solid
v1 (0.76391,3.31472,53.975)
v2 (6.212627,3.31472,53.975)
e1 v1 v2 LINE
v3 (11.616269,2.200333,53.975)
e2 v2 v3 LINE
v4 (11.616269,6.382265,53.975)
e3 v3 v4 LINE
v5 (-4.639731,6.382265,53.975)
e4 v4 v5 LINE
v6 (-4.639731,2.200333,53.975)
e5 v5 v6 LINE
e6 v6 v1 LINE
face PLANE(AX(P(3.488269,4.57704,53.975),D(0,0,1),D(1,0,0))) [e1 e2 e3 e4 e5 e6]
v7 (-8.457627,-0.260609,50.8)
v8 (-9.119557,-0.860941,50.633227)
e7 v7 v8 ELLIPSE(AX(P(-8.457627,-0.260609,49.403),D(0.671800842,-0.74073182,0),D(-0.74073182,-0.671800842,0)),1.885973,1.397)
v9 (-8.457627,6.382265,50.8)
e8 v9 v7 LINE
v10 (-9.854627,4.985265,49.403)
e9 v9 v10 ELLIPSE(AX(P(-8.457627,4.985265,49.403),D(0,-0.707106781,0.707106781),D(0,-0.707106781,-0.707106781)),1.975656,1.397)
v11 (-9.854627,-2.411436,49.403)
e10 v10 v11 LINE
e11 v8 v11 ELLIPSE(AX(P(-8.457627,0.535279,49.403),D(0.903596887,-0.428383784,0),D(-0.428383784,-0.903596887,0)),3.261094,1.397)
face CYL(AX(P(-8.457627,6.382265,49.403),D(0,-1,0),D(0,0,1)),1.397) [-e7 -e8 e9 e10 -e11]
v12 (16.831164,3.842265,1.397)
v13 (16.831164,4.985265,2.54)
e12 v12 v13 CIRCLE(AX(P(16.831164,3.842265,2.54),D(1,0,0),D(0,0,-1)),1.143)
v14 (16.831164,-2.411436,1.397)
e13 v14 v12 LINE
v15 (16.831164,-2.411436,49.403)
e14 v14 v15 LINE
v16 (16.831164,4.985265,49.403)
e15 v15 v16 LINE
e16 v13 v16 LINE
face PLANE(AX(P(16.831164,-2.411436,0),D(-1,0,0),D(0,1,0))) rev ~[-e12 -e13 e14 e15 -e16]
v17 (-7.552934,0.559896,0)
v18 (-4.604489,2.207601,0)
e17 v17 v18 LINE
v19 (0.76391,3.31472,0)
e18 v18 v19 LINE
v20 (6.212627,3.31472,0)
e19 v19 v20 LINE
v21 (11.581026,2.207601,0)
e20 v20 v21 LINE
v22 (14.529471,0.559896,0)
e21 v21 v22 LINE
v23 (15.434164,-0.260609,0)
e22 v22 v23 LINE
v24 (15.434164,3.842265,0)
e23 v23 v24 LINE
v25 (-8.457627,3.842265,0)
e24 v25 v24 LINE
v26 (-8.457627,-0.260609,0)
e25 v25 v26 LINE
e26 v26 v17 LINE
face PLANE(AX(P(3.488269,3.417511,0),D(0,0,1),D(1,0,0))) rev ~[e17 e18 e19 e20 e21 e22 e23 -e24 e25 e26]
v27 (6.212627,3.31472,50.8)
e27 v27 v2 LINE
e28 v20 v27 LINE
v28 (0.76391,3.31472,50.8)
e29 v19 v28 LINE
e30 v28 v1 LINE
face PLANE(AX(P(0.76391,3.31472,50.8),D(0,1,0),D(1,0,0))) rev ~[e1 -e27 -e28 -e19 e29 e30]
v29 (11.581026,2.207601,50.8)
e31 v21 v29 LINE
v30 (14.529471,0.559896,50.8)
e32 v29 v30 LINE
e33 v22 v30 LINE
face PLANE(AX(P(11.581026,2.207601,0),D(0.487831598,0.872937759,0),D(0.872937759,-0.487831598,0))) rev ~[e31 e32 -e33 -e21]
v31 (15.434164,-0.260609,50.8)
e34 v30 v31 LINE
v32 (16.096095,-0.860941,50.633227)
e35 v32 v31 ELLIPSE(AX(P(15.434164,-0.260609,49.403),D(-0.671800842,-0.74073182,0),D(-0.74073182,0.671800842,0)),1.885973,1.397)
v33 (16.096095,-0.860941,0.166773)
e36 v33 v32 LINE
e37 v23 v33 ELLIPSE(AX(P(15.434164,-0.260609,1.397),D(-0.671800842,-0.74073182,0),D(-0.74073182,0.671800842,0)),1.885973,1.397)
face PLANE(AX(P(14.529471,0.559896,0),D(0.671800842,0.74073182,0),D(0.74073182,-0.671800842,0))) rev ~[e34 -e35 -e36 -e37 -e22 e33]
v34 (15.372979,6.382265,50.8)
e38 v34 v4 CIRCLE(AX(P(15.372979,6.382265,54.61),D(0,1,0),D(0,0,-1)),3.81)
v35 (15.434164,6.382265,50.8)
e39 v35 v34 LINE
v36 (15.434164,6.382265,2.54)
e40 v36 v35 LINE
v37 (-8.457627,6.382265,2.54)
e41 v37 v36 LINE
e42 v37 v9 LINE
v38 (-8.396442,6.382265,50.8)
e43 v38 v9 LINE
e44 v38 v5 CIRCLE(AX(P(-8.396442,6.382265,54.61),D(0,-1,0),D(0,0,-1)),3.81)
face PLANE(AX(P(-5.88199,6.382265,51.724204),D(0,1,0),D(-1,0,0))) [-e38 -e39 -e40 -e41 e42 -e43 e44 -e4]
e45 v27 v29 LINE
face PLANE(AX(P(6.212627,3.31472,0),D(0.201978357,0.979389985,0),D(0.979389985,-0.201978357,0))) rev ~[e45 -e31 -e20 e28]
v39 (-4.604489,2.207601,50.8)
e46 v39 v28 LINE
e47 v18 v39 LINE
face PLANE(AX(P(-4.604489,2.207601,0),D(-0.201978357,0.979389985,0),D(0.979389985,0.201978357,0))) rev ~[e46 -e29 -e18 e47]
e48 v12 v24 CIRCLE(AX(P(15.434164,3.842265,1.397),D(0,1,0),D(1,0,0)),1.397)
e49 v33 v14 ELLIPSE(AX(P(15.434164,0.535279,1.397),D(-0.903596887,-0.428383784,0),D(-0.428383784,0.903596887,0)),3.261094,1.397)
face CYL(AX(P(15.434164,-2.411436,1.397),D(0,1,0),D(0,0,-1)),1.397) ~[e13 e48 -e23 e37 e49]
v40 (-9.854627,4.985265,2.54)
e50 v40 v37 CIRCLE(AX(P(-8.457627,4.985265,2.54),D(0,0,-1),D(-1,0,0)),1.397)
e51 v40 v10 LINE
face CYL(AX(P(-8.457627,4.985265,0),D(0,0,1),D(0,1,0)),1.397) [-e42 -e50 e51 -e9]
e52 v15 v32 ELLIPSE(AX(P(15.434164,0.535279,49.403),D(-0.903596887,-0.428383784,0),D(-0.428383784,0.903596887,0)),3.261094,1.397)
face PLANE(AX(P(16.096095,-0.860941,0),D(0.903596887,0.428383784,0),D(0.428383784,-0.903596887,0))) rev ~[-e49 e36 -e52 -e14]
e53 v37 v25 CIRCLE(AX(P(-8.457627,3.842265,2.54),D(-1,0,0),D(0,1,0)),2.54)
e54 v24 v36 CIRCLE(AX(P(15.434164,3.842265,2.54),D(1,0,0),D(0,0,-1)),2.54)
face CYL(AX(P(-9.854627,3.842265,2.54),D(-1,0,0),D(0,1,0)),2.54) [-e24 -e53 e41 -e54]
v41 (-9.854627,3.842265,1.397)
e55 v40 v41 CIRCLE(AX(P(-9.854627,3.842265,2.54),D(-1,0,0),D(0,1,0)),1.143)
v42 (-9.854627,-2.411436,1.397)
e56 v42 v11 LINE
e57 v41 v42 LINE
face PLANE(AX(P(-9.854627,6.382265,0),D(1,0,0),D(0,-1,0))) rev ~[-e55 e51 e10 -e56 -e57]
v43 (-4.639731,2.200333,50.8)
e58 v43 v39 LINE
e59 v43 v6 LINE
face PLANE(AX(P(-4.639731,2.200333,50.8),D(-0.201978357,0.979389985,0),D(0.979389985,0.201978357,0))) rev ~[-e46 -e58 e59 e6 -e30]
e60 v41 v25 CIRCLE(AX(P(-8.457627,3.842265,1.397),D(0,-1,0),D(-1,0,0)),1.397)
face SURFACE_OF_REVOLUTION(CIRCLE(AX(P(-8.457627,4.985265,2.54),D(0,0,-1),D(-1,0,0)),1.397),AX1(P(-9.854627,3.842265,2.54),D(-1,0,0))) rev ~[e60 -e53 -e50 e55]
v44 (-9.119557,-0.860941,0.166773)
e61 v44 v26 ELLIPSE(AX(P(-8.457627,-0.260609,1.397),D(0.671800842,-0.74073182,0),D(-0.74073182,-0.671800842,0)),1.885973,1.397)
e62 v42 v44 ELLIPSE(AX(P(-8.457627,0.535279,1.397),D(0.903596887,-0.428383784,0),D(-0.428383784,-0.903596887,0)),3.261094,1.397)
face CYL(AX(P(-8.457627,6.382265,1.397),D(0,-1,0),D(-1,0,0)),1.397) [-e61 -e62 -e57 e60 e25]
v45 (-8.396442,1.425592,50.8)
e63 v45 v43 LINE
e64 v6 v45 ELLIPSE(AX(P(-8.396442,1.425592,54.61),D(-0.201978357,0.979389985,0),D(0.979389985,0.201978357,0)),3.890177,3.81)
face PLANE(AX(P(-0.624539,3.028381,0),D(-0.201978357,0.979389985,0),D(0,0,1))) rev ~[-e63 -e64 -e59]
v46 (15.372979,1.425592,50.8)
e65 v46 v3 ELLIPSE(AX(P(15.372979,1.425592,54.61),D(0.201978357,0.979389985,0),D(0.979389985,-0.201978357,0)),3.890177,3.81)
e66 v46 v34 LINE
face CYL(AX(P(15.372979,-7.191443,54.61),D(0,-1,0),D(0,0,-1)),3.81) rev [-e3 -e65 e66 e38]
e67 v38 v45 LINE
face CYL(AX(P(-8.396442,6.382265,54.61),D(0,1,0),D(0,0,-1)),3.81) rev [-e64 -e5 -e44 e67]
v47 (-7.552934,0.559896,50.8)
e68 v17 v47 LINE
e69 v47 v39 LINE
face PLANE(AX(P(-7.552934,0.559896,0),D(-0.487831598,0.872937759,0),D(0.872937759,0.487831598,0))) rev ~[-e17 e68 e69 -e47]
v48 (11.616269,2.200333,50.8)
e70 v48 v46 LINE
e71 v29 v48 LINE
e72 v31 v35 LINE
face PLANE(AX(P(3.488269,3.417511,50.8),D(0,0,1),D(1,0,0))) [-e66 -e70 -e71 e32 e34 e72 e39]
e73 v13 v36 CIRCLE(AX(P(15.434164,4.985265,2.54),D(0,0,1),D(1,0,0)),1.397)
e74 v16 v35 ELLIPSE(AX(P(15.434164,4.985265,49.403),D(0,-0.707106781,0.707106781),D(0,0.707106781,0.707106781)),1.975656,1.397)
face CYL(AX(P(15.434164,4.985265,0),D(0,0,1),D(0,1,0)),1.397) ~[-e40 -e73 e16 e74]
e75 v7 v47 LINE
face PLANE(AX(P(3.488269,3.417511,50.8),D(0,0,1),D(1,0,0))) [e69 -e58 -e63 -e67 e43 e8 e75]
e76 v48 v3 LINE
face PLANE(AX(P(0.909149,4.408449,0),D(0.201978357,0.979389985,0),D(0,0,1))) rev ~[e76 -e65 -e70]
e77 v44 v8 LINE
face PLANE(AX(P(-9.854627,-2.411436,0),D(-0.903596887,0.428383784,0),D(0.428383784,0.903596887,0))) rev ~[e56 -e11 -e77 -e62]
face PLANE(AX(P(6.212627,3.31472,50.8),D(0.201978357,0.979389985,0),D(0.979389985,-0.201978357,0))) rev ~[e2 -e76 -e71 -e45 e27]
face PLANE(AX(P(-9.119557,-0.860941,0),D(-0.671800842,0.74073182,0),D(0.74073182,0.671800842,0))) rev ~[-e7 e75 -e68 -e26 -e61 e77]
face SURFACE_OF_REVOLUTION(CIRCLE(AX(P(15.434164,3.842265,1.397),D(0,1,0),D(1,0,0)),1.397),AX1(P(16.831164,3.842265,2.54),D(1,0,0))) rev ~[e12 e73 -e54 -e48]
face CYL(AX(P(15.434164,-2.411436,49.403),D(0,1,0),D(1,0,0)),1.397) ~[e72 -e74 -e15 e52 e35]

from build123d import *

# Parameters (mm, degrees)
F1_DEPTH    = 50.8
F4_DEPTH    = 3.175
F5_T4_DEPTH = 13.5737083661
F5_T9_DEPTH = 13.5737083661
F6_R        = 1.397
F7_T1_DEPTH = 26.6857916153
F7_T4_ANGLE = 90
F7_T6_ANGLE = 90


# Not quite as in the source:
# - a fillet or chamfer that OpenCascade refuses, or shapes differently, is made with other operations: its cross-section is extruded or revolved along the edge and cut away or added


with BuildPart() as f1:
    # F0 (on Top) → F1 (new body)
    with BuildSketch(Plane.XY):
        Polygon((16.83116441, 6.3822651147), (-9.8546272053, 6.3822651147), (-9.8546272053, -2.4114359531), (-9.1195573698, -0.8609411879), (-7.5529336119, 0.5598957894), (-4.6044890144, 2.2076013963), (0.7639104889, 3.3147196292), (6.2126267158, 3.3147196292), (11.5810262191, 2.2076013963), (14.5294708166, 0.5598957894), (16.0960945745, -0.8609411879), (16.83116441, -2.4114359531), align=None)
    extrude(amount=F1_DEPTH)

    # F3 (on face) → F4 (join)
    with BuildSketch(Plane.XY.offset(50.8)):
        Polygon((11.6162686024, 6.3822651147), (-4.6397313976, 6.3822651147), (-4.6397313976, 2.2003334042), (0.7639104889, 3.3147196292), (6.2126267158, 3.3147196292), (11.6162686024, 2.2003334042), align=None)
    extrude(amount=F4_DEPTH)

    # F5: fillet of radius 3.81 on 2 edges, made by hand


with BuildPart() as f5_tool2:
    # F5_s3 → F5_t4 (new body)
    with BuildSketch(Plane.XZ.offset(7.1914432514)):
        with BuildLine():
            ThreePointArc((15.3729792646, 50.8), (12.9136348398, 51.7000644337), (11.6162686024, 53.975))
            Line((11.6162686024, 53.975), (11.6162686024, 50.8))
            Line((11.6162686024, 50.8), (15.3729792646, 50.8))
        make_face()
    extrude(amount=-F5_T4_DEPTH)

    split(bisect_by=Plane(origin=(0.9091488864, 4.4084491475, 0), x_dir=(0, 0, 1), z_dir=(0.2019783567, 0.9793899854, 0)), keep=Keep.TOP)


with BuildPart() as f1_1:
    add(f1.part)

    # F5_t1: union F5_tool2
    add(f5_tool2.part)


with BuildPart() as f5_tool7:
    # F5_s8 → F5_t9 (new body)
    with BuildSketch(Plane.XZ.offset(-6.3822651147)):
        with BuildLine():
            ThreePointArc((-8.3964420599, 50.8), (-5.9370976351, 51.7000644337), (-4.6397313976, 53.975))
            Line((-4.6397313976, 53.975), (-4.6397313976, 50.8))
            Line((-4.6397313976, 50.8), (-8.3964420599, 50.8))
        make_face()
    extrude(amount=F5_T9_DEPTH)

    split(bisect_by=Plane(origin=(-0.624539261, 3.0283813951, 0), x_dir=(0, 0, 1), z_dir=(-0.2019783567, 0.9793899854, 0)), keep=Keep.TOP)


with BuildPart() as f1_2:
    add(f1_1.part)

    # F5_t6: union F5_tool7
    add(f5_tool7.part)

    # F6
    f6_edges = [f1_2.edges().sort_by_distance(p)[0] for p in [
        (-9.854627, 1.985415, 50.8),
        (16.831164, 1.985415, 50.8),
        (16.831164, 1.985415, 0),
        (-9.854627, 1.985415, 0),
        (16.831164, 6.382265, 25.4),
        (-9.854627, 6.382265, 25.4),
    ]]
    fillet(f6_edges, radius=F6_R)

    # F7: fillet of radius 2.54 on 1 edges, made by hand

    # F7_s2 → F7_t1 (cut)
    with BuildSketch(Plane.YZ.offset(-9.8546272053)):
        with BuildLine():
            ThreePointArc((6.3822651147, 2.54), (5.6383163389, 0.7439487758), (3.8422651147, 0))
            Line((3.8422651147, 0), (6.3822651147, 0))
            Line((6.3822651147, 0), (6.3822651147, 2.54))
        make_face()
    extrude(amount=F7_T1_DEPTH, mode=Mode.SUBTRACT)

    # F7_s3 → F7_t4 (revolve, cut)
    with BuildSketch(Plane.XZ.offset(-3.8422651147)):
        with BuildLine():
            ThreePointArc((16.83116441, 1.397), (16.4219925833, 0.4091718267), (15.43416441, 0))
            Line((15.43416441, 0), (16.83116441, 0))
            Line((16.83116441, 0), (16.83116441, 1.397))
        make_face()
    revolve(axis=Axis((16.83116441, 3.8422651147, 2.54), (1, 0, 0)), revolution_arc=F7_T4_ANGLE, mode=Mode.SUBTRACT)

    # F7_s5 → F7_t6 (revolve, cut)
    with BuildSketch(Plane.XY.offset(2.54)):
        with BuildLine():
            ThreePointArc((-9.8546272053, 4.9852651147), (-9.4454553786, 5.973093288), (-8.4576272053, 6.3822651147))
            Line((-8.4576272053, 6.3822651147), (-9.8546272053, 6.3822651147))
            Line((-9.8546272053, 6.3822651147), (-9.8546272053, 4.9852651147))
        make_face()
    revolve(axis=Axis((-9.8546272053, 3.8422651147, 2.54), (-1, 0, 0)), revolution_arc=F7_T6_ANGLE, mode=Mode.SUBTRACT)


solid = f1_2.part
